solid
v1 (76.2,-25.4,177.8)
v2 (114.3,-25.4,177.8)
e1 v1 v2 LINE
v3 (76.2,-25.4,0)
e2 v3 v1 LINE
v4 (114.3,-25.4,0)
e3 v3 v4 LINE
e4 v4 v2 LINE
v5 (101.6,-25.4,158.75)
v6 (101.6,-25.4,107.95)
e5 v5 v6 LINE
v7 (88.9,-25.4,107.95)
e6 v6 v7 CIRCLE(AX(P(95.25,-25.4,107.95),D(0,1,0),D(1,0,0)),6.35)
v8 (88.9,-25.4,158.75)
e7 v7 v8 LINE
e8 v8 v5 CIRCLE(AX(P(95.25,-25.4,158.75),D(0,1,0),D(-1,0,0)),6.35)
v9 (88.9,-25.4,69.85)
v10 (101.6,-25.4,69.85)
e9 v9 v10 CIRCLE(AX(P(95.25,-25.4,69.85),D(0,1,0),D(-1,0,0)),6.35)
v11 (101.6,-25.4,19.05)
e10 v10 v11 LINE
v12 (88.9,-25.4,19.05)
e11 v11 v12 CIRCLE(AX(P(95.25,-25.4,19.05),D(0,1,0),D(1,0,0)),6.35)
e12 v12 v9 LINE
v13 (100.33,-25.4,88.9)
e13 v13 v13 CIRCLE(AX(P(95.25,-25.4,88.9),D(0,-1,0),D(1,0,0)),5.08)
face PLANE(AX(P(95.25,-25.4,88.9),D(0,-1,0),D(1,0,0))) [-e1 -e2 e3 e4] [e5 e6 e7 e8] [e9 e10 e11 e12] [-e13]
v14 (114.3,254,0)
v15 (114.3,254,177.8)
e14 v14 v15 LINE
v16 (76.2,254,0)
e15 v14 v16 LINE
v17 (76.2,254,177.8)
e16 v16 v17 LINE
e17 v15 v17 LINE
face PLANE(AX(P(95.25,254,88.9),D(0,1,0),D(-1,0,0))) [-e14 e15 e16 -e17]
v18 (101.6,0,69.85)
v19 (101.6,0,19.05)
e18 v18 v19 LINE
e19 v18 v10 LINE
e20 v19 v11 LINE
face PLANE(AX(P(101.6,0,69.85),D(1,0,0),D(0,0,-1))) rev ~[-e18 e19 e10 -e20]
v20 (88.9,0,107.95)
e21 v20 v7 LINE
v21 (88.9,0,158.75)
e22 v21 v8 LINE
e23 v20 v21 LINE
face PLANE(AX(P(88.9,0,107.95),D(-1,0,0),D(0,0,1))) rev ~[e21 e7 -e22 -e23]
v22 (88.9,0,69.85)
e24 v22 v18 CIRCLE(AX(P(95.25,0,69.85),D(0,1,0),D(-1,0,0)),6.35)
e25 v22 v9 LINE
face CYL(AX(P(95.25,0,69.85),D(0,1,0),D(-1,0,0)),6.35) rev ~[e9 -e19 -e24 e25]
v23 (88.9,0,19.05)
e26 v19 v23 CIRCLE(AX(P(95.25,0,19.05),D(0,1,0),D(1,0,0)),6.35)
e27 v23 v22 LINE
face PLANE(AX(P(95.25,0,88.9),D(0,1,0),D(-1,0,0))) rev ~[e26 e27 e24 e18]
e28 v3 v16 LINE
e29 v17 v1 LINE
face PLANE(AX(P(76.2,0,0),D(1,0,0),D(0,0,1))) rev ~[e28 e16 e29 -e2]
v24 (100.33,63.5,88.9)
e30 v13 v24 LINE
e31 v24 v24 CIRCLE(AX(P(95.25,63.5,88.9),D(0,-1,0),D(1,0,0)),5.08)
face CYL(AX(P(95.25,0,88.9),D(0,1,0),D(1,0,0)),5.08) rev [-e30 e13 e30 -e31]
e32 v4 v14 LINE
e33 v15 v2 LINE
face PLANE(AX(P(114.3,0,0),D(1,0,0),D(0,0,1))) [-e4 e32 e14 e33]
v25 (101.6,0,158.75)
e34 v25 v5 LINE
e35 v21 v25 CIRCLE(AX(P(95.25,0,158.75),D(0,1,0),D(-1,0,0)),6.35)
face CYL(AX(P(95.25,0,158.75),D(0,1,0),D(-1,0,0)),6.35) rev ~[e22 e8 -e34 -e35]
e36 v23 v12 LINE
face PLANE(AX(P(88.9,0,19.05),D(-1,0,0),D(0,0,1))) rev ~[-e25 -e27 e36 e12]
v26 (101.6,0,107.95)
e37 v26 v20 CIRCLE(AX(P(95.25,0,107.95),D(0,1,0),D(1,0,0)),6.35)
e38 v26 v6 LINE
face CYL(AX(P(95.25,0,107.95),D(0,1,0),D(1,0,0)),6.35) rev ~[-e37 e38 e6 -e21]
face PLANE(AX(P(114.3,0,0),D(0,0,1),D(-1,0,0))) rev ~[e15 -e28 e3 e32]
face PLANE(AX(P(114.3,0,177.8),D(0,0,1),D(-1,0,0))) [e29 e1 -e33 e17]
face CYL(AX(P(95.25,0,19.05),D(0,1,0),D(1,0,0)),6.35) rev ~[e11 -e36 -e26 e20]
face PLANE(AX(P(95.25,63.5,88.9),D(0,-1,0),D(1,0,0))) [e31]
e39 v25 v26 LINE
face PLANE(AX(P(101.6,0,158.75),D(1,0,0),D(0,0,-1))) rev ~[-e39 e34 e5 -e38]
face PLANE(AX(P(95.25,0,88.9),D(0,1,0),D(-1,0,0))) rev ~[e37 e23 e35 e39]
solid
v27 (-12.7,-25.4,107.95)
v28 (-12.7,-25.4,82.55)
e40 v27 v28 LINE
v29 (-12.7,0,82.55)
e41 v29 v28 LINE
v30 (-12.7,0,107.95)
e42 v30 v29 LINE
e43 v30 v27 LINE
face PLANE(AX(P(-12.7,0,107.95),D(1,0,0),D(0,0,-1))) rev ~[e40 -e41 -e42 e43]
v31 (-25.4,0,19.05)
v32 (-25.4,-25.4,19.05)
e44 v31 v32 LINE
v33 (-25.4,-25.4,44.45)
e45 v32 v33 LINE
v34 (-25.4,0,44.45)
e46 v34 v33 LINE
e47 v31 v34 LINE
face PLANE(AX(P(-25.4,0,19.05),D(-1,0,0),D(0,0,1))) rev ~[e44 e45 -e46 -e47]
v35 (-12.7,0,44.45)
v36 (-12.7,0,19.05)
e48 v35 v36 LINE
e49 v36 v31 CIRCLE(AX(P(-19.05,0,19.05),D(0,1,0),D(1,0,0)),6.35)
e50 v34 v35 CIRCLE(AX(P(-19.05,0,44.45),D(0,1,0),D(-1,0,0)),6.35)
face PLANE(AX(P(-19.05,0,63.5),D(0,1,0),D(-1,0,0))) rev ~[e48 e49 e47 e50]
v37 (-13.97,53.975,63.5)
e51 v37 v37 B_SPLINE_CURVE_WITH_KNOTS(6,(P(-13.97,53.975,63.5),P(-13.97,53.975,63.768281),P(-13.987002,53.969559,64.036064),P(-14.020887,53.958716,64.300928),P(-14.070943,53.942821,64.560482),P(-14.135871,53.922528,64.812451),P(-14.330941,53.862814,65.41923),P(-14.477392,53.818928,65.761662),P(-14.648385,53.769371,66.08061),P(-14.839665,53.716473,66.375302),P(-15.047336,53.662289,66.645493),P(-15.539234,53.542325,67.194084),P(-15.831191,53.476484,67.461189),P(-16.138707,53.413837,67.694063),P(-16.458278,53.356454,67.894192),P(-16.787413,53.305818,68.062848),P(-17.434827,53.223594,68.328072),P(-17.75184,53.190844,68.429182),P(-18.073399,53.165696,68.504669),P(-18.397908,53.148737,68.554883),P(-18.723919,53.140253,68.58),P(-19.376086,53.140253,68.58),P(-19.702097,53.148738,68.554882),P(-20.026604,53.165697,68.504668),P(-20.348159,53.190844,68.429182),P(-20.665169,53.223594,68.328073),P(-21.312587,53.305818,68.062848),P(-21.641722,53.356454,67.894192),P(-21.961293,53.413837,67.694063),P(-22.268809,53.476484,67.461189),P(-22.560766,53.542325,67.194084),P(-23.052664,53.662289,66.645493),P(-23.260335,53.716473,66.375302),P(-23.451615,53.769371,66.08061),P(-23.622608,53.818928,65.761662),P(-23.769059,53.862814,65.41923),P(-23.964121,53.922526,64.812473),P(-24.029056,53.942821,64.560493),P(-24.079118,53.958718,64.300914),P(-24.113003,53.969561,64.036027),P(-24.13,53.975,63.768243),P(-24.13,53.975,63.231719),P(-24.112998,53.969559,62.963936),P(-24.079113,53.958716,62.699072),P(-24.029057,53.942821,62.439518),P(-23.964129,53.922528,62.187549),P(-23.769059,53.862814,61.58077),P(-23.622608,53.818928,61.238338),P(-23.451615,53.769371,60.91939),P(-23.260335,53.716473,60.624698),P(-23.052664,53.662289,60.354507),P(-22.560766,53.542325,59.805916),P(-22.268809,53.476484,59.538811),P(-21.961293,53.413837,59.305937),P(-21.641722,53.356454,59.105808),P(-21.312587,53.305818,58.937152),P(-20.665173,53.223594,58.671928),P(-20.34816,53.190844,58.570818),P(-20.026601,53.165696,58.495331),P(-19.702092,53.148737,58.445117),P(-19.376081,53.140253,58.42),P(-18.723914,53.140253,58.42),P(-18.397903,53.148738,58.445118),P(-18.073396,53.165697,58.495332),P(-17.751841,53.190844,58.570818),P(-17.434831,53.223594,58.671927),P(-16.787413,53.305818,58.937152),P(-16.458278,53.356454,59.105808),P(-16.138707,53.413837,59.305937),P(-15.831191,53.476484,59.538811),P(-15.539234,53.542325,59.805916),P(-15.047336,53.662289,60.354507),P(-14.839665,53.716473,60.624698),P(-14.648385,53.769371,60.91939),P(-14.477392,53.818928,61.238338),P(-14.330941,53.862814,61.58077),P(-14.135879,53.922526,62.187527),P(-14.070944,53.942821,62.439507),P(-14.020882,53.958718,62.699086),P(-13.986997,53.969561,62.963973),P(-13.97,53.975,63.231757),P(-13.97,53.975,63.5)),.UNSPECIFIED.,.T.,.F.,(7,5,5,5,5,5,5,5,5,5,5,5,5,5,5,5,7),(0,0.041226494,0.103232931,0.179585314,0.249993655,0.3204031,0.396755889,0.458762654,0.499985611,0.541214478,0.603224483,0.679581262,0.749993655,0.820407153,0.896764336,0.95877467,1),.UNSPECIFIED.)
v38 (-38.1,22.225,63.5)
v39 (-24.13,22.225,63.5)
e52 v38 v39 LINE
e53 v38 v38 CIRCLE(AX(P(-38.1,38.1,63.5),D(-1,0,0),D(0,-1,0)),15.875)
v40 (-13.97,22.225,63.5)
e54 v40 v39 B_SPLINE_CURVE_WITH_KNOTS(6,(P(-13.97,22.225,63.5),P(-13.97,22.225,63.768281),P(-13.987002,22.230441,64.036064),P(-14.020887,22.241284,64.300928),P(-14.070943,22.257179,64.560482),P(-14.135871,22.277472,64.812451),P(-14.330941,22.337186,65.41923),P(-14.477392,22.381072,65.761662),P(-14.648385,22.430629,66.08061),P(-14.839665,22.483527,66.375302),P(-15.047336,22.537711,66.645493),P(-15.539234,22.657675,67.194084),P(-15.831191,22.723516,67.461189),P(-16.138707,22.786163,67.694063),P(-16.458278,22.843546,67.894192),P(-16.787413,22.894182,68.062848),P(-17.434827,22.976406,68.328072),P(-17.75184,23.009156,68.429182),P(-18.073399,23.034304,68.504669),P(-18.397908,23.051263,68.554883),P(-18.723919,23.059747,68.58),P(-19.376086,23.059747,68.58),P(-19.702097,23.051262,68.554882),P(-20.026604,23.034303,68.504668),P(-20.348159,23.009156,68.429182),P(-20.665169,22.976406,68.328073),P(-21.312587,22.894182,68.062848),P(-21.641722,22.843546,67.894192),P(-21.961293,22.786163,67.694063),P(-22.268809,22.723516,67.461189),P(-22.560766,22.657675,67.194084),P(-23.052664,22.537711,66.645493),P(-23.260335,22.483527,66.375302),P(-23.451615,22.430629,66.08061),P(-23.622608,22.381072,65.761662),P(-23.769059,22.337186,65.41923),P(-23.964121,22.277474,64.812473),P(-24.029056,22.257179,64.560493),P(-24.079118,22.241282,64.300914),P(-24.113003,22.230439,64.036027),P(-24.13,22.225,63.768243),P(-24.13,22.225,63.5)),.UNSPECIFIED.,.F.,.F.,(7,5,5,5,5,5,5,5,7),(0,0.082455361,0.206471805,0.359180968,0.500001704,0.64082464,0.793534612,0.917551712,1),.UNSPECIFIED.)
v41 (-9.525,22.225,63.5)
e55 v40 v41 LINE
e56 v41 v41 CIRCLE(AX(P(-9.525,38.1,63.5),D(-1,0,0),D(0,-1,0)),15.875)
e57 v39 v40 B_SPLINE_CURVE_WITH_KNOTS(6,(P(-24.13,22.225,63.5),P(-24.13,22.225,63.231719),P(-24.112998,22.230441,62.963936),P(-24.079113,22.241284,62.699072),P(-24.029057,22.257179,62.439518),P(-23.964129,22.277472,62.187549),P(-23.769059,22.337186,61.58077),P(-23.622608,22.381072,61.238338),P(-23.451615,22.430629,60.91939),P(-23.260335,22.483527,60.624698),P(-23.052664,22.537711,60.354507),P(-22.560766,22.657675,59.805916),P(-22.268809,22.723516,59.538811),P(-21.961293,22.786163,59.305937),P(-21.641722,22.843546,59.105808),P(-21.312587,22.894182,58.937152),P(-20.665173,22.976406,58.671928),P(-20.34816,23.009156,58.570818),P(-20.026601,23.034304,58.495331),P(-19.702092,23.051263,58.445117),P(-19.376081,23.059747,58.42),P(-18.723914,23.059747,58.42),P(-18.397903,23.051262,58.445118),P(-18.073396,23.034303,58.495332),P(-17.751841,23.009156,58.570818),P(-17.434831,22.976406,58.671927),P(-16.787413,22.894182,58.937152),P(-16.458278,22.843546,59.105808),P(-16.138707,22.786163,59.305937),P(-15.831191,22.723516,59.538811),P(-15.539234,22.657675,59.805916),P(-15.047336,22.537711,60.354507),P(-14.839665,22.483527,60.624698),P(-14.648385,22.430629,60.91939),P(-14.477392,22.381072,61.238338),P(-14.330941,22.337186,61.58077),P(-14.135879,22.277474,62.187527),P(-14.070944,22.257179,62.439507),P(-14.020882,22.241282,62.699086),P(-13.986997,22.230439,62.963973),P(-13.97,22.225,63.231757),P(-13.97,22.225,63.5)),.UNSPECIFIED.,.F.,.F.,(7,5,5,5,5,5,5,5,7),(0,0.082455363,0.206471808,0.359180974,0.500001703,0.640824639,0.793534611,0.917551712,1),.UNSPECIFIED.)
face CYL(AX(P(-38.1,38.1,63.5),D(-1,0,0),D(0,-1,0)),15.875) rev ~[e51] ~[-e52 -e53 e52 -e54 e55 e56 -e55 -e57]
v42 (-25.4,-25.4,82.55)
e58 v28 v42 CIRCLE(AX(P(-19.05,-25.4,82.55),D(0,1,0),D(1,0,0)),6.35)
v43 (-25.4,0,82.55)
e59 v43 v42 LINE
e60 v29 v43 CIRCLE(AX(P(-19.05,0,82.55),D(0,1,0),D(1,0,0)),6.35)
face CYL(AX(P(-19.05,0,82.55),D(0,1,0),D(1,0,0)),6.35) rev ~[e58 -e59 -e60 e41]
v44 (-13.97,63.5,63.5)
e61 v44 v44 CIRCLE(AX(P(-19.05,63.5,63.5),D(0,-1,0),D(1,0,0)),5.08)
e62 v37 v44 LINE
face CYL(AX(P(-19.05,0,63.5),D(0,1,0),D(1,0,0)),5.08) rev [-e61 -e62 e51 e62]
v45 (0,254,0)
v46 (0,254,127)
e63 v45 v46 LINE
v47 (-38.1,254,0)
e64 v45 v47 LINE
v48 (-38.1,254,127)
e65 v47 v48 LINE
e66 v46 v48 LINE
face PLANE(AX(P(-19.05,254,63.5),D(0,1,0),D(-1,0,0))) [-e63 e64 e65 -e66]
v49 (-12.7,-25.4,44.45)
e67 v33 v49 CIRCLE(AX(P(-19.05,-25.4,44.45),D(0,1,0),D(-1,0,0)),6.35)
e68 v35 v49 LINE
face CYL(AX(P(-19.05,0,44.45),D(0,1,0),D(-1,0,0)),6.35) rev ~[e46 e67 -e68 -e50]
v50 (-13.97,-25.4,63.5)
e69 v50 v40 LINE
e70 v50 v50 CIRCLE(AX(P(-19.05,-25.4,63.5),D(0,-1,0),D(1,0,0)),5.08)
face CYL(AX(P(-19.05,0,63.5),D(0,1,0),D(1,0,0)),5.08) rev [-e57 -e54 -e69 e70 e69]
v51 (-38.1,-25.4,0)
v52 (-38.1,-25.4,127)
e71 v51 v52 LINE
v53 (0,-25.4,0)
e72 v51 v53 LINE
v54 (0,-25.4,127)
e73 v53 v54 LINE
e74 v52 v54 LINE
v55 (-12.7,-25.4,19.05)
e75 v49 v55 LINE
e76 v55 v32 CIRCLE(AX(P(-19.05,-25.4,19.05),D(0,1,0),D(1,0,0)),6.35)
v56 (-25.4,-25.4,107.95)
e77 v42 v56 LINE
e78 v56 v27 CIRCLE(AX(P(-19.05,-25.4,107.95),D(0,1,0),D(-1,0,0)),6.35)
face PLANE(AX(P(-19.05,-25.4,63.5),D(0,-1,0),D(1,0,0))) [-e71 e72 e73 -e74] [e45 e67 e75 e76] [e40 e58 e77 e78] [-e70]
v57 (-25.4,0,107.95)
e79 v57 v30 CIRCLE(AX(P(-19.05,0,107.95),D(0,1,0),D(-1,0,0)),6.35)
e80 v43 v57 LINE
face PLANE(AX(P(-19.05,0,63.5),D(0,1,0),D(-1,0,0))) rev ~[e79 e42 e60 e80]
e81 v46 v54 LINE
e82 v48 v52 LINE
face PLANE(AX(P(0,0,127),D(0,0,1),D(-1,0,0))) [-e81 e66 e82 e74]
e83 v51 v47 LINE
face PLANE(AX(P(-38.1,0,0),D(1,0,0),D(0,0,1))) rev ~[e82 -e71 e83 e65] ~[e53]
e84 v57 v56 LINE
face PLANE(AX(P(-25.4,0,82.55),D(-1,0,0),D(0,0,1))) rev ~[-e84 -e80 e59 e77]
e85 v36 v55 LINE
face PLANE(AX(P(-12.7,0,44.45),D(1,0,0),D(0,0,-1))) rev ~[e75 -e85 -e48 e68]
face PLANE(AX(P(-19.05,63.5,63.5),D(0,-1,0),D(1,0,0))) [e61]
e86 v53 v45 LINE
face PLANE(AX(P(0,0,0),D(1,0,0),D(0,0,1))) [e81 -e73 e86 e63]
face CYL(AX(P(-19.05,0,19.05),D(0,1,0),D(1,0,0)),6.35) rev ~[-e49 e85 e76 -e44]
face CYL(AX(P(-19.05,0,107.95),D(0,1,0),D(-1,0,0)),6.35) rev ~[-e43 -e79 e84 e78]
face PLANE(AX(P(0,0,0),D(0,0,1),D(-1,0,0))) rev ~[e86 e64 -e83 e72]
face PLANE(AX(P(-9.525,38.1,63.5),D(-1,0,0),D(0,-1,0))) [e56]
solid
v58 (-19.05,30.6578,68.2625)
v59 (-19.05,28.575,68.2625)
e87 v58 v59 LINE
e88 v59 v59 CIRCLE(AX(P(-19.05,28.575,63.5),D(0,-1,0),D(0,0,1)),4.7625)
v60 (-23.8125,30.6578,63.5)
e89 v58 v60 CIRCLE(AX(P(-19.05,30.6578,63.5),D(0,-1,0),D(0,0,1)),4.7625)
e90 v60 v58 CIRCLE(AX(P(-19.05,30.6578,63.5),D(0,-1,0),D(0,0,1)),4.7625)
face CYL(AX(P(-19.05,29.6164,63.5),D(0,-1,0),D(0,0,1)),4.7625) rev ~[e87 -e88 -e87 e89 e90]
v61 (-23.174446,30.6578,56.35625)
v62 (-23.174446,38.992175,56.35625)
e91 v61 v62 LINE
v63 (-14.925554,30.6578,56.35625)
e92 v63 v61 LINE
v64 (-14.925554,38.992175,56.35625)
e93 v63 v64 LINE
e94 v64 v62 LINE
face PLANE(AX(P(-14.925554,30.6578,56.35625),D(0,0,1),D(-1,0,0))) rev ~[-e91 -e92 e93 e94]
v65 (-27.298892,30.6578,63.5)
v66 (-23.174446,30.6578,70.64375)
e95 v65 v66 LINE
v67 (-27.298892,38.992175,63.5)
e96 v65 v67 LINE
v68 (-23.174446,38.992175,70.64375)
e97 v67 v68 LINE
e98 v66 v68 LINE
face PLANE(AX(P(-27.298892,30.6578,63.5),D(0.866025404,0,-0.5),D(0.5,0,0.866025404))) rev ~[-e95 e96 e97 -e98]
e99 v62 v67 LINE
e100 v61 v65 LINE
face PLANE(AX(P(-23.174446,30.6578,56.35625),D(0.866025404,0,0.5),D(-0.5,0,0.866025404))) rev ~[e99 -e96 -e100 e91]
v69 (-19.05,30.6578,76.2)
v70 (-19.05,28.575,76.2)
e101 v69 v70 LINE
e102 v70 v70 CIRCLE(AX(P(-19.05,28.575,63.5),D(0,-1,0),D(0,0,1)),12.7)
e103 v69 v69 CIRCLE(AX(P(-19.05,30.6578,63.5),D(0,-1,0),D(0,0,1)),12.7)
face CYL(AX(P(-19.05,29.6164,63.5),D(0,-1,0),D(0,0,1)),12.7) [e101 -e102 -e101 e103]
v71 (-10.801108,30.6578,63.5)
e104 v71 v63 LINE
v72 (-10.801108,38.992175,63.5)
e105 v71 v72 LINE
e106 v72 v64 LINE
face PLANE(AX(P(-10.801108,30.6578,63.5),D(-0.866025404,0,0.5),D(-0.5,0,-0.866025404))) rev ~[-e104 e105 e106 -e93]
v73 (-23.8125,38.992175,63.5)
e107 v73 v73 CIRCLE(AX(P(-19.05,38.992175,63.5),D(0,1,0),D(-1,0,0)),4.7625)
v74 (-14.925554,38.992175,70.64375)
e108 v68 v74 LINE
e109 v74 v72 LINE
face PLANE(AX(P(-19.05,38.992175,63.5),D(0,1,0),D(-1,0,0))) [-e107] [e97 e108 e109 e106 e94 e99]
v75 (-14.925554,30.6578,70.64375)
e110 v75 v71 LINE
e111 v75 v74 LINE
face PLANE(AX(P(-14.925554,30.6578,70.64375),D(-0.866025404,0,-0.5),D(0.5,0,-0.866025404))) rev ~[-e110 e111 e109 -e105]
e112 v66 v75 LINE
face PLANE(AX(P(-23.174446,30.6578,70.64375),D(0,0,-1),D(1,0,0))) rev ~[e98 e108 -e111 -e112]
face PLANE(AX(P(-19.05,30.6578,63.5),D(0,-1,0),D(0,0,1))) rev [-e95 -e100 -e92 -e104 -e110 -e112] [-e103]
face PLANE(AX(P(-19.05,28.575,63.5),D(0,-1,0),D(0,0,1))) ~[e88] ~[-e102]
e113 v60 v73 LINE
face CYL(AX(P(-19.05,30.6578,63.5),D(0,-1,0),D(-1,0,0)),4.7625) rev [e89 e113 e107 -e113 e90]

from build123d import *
from build123d import SkipClean  # not in build123d's __all__

# Parameters (mm, degrees)
F0_W      = 38.1
F0_H      = 127
F0_R      = 5.08
F1_DEPTH  = 25.4
F0_H_2    = 177.8
F2_W      = 38.1
F2_H      = 177.8
F3_DEPTH  = 254
F2_H_2    = 127
F4_R      = 5.08
F5_DEPTH  = 63.5
F6_R      = 15.875
F7_DEPTH  = 28.575
F10_W     = 2.0828
F10_H     = 7.9375
F12_R     = 4.7625
F13_DEPTH = 8.334375


with BuildPart() as f1:
    # F0 (on Front) → F1 (new body)
    with BuildSketch(Plane.XZ):
        with Locations((-19.05, 63.5)):
            Rectangle(F0_W, F0_H)
        with BuildLine():
            Line((-25.4, 19.05), (-25.4, 44.45))
            ThreePointArc((-25.4, 44.45), (-19.05, 50.8), (-12.7, 44.45))
            Line((-12.7, 44.45), (-12.7, 19.05))
            ThreePointArc((-12.7, 19.05), (-19.05, 12.7), (-25.4, 19.05))
        make_face(mode=Mode.SUBTRACT)
        with Locations((-19.05, 63.5)):
            Circle(F0_R, mode=Mode.SUBTRACT)
        with BuildLine():
            Line((-12.7, 107.95), (-12.7, 82.55))
            ThreePointArc((-12.7, 82.55), (-19.05, 76.2), (-25.4, 82.55))
            Line((-25.4, 82.55), (-25.4, 107.95))
            ThreePointArc((-25.4, 107.95), (-19.05, 114.3), (-12.7, 107.95))
        make_face(mode=Mode.SUBTRACT)
    extrude(amount=F1_DEPTH)

    # F2 (on face) → F3, piece 2 (join)
    with BuildSketch(Plane(origin=(0, 0, 0), x_dir=(-1, 0, 0), z_dir=(0, 1, 0))):
        with Locations((19.05, 63.5)):
            Rectangle(F2_W, F2_H_2)
    extrude(amount=F3_DEPTH)


with BuildPart() as f1b:
    # F0 (on Front) → F1, piece 2 (new body)
    with BuildSketch(Plane.XZ):
        with Locations((95.25, 88.9)):
            Rectangle(F0_W, F0_H_2)
        with BuildLine():
            Line((101.6, 69.85), (101.6, 19.05))
            ThreePointArc((101.6, 19.05), (95.25, 12.7), (88.9, 19.05))
            Line((88.9, 19.05), (88.9, 69.85))
            ThreePointArc((88.9, 69.85), (95.25, 76.2), (101.6, 69.85))
        make_face(mode=Mode.SUBTRACT)
        with Locations((95.25, 88.9)):
            Circle(F0_R, mode=Mode.SUBTRACT)
        with BuildLine():
            ThreePointArc((101.6, 107.95), (95.25, 101.6), (88.9, 107.95))
            Line((88.9, 107.95), (88.9, 158.75))
            ThreePointArc((88.9, 158.75), (95.25, 165.1), (101.6, 158.75))
            Line((101.6, 158.75), (101.6, 107.95))
        make_face(mode=Mode.SUBTRACT)
    extrude(amount=F1_DEPTH)

    # F2 (on face) → F3 (join)
    with BuildSketch(Plane(origin=(0, 0, 0), x_dir=(-1, 0, 0), z_dir=(0, 1, 0))):
        with Locations((-95.25, 88.9)):
            Rectangle(F2_W, F2_H)
    extrude(amount=F3_DEPTH)


with BuildPart() as f5_tool:
    # F4 (on face) → F5 (new body)
    with BuildSketch(Plane.XZ):
        with Locations((-19.05, 63.5)):
            Circle(F4_R)
        with Locations((95.25, 88.9)):
            Circle(F4_R)
    extrude(amount=-F5_DEPTH)


with BuildPart() as f1_1:
    add(f1.part, clean=False)

    # F5: cut by f5_tool
    add(f5_tool.part, mode=Mode.SUBTRACT)

    # F6 (on face) → F7 (cut)
    with BuildSketch(Plane(origin=(-38.1, 0, 0), x_dir=(0, -1, 0), z_dir=(-1, 0, 0))):
        with Locations((-38.1, 63.5)):
            Circle(F6_R)
    extrude(amount=-F7_DEPTH, mode=Mode.SUBTRACT)


with BuildPart() as f1b_1:
    add(f1b.part, clean=False)

    # F5: cut by f5_tool
    add(f5_tool.part, mode=Mode.SUBTRACT)


with BuildPart() as f11:
    # F10 (on plane+point) → F11 (revolve)
    with BuildSketch(Plane(origin=(-19.05, 0, 0), x_dir=(0, -1, 0), z_dir=(-1, 0, 0))):
        with Locations((-29.6164, 72.23125)):
            Rectangle(F10_W, F10_H)
    revolve(axis=Axis((-19.05, 9.597724928, 63.5), (0, -1, 0)))

    # F12 (on face) → F13 (join)
    with BuildSketch(Plane(origin=(0, 30.6578, 0), x_dir=(-1, 0, 0), z_dir=(0, 1, 0))):
        Polygon((27.298891971, 63.5), (23.1744459855, 70.64375), (14.9255540145, 70.64375), (10.801108029, 63.5), (14.9255540145, 56.35625), (23.1744459855, 56.35625), align=None)
        with Locations((19.05, 63.5)):
            Circle(F12_R, mode=Mode.SUBTRACT)
    with SkipClean():  # cleaning this boolean's faces spoils the solid; the shape is the same uncleaned
        extrude(amount=F13_DEPTH)


solid = Compound([f1_1.part, f1b_1.part, f11.part])
